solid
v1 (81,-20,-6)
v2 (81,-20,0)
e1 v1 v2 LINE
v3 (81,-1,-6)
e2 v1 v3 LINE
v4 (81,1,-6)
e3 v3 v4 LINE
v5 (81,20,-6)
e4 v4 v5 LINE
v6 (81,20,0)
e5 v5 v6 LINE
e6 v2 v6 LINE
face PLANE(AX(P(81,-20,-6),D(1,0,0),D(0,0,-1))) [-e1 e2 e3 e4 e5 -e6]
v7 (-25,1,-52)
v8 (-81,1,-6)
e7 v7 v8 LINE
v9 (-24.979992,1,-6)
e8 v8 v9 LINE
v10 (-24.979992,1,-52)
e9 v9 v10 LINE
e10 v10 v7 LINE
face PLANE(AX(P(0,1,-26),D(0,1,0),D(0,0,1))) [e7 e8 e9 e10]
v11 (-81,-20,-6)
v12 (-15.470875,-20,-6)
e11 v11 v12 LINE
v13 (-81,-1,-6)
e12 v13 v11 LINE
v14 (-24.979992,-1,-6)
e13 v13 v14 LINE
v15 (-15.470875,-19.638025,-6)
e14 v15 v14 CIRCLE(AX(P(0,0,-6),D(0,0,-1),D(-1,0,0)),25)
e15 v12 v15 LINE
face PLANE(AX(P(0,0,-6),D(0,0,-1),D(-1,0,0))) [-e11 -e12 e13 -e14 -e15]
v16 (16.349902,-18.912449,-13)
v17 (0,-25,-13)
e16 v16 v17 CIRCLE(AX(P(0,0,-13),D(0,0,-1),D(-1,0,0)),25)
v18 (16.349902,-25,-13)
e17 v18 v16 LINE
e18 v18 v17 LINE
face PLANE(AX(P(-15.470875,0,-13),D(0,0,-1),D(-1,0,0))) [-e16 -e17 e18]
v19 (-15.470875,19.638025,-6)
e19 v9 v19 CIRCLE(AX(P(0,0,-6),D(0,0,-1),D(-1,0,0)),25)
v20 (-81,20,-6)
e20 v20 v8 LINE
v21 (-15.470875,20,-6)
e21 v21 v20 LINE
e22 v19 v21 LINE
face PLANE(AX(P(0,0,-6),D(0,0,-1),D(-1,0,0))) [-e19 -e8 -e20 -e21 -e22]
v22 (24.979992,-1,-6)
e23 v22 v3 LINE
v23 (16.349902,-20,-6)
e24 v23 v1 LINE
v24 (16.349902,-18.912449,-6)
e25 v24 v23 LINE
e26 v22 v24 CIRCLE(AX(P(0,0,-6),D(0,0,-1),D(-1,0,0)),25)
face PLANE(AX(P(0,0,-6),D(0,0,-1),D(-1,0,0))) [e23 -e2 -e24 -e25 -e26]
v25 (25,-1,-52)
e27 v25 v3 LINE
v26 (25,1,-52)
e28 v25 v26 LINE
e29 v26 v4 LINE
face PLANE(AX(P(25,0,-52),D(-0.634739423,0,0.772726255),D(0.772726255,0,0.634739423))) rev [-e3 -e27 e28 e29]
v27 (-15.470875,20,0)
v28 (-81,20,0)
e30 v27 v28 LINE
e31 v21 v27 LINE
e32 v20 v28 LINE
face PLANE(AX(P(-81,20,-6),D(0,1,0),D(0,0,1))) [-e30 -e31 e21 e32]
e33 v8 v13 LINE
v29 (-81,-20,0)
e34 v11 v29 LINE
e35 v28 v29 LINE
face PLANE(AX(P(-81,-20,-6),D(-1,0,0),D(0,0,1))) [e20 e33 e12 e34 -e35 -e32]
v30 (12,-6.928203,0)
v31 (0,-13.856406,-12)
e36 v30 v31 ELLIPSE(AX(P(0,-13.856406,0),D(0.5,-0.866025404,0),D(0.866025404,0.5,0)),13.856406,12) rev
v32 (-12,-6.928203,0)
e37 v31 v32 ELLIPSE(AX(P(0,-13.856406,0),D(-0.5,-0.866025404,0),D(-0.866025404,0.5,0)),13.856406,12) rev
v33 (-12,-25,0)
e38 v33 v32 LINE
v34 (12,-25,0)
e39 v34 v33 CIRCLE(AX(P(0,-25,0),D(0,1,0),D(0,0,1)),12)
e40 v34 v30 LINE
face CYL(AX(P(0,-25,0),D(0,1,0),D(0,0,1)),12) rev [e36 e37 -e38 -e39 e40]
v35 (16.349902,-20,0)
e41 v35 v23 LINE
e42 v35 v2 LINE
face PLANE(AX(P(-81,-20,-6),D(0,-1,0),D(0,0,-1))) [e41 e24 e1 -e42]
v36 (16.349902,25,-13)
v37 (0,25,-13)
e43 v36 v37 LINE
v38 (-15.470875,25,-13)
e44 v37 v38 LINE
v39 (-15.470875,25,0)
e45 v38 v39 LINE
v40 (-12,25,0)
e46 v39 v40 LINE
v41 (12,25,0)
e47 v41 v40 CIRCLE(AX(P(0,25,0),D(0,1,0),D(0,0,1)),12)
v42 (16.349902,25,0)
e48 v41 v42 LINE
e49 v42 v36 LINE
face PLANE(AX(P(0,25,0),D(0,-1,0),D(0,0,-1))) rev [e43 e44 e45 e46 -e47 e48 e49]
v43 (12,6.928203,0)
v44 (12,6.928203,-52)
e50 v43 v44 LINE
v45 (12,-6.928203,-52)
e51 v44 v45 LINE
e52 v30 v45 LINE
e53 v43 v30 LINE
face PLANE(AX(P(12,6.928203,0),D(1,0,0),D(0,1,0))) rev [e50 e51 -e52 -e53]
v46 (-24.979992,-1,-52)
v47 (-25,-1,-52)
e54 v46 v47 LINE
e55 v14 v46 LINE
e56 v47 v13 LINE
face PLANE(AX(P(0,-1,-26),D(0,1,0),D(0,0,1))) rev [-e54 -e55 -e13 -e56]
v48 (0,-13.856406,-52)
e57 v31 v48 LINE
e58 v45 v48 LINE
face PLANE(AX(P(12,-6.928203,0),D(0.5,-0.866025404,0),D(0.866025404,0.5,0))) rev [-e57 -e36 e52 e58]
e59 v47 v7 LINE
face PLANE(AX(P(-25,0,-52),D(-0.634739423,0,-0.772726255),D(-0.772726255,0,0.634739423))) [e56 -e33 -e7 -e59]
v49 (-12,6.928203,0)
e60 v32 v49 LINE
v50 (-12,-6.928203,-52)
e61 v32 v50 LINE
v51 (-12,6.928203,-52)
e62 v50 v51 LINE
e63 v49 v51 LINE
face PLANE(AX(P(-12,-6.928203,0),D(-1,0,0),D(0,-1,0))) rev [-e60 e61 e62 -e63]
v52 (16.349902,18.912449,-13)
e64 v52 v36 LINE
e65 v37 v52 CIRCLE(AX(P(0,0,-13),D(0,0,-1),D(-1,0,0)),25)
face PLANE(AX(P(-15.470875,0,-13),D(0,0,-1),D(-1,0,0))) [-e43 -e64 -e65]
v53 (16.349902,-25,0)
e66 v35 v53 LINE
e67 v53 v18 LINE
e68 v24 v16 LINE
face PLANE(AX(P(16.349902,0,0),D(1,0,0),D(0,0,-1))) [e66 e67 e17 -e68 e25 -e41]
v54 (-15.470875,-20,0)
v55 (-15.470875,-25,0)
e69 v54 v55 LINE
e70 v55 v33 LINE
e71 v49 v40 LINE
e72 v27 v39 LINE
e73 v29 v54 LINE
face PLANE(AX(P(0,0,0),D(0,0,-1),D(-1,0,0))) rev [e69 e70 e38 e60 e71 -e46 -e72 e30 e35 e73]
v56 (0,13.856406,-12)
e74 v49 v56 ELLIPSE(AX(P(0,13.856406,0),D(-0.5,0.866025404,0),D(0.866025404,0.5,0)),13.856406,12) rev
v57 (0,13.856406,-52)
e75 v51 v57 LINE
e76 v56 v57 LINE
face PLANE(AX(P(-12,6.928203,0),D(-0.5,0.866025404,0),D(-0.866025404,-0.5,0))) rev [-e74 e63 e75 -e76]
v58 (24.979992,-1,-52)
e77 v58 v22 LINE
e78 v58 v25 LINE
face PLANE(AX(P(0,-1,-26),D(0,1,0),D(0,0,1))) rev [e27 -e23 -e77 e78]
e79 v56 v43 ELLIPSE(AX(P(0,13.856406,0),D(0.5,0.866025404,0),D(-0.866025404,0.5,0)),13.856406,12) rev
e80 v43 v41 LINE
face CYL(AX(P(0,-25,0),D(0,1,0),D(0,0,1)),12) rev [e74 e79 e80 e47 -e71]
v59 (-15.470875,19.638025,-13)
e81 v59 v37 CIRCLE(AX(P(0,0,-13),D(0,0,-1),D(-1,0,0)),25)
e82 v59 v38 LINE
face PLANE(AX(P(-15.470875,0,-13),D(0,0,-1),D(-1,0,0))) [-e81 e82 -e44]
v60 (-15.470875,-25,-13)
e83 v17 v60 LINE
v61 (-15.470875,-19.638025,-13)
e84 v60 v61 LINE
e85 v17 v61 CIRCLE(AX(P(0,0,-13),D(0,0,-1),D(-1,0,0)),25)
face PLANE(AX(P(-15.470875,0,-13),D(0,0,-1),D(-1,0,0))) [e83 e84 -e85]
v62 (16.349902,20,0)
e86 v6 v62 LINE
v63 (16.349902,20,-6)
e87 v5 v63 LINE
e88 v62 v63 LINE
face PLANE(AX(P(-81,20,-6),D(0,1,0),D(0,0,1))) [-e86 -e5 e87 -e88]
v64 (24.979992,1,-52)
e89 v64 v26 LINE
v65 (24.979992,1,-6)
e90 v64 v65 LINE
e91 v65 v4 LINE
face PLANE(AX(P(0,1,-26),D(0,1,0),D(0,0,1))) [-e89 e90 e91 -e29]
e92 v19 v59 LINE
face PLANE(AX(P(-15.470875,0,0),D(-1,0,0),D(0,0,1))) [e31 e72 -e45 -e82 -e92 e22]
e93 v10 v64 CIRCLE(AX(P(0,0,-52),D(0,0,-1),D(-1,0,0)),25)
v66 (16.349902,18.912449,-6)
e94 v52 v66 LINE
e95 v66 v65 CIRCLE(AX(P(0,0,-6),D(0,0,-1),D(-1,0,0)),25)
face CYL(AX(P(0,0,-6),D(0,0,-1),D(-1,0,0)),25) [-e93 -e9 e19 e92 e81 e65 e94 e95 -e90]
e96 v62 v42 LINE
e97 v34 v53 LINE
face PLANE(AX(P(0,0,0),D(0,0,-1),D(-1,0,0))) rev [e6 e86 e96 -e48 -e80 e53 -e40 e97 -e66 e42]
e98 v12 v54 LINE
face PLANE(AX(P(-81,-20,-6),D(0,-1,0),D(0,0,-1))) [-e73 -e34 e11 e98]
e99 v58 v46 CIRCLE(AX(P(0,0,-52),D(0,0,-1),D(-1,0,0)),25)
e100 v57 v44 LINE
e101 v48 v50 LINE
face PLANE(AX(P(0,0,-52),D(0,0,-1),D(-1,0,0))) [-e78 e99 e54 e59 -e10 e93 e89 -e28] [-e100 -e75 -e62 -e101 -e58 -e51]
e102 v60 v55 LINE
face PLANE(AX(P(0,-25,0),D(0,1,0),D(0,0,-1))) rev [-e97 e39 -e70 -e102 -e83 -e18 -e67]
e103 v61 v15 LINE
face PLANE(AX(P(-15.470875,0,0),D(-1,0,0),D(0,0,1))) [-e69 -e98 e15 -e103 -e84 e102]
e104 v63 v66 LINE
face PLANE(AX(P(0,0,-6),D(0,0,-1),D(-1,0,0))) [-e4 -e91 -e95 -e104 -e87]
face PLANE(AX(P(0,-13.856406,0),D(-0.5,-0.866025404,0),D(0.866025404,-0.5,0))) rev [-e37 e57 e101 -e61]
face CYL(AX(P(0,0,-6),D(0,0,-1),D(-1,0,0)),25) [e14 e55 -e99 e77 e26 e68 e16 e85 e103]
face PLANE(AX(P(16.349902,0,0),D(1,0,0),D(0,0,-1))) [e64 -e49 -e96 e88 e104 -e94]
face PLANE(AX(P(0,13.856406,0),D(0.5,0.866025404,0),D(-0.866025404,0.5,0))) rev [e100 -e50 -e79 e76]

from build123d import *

# Parameters (mm, degrees)
SKETCH1_W                = 162
SKETCH1_H                = 40
BOSS_EXTRUDE1_DEPTH      = 6
BOSS_EXTRUDE2_START      = -20
SKETCH2_W                = 31.820776168
SKETCH2_H                = 13
BOSS_EXTRUDE2_DEPTH      = 25
CUT_EXTRUDE1_DEPTH       = 97.072888996
BOSS_EXTRUDE3_DEPTH      = 39
BOSS_EXTRUDE3_DEPTH_BACK = 7
SKETCH4_R                = 25
SKETCH5_R                = 12
CUT_EXTRUDE3_DEPTH       = 109.466584762
CUT_EXTRUDE4_DEPTH       = 100.448479124
RIB5_START               = -1
RIB5_DEPTH               = 2


with BuildPart() as part:
    # Sketch1 → Boss-Extrude1 (new body)
    with BuildSketch(Plane.XY):
        Rectangle(SKETCH1_W, SKETCH1_H)
    extrude(amount=-BOSS_EXTRUDE1_DEPTH)

    # Sketch2 → Boss-Extrude2 (add)
    with BuildSketch(Plane(origin=(0, 20, 0), x_dir=(1, 0, 0), z_dir=(0, 1, 0)).offset(BOSS_EXTRUDE2_START)):
        with Locations((0.439513483, 6.5)):
            Rectangle(SKETCH2_W, SKETCH2_H)
    boss_extrude2 = extrude(amount=BOSS_EXTRUDE2_DEPTH)

    # Mirror1: Boss-Extrude2 across plane
    add(boss_extrude2.mirror(Plane.ZX))

    # Sketch3 → Cut-Extrude1 (cut, through all)
    with BuildSketch(Plane(origin=(0, 25, 0), x_dir=(1, 0, 0), z_dir=(0, 1, 0))):
        with BuildLine():
            Line((-12, 0), (12, 0))
            ThreePointArc((12, 0), (0, 12), (-12, 0))
        make_face()
    extrude(amount=-CUT_EXTRUDE1_DEPTH, mode=Mode.SUBTRACT)

    # Sketch4 → Boss-Extrude3 (add, two sides: drawn at the far end of the back side and taken through both)
    with BuildSketch(Plane(origin=(0, 0, -13), x_dir=(-1, 0, 0), z_dir=(0, 0, -1)).offset(-BOSS_EXTRUDE3_DEPTH_BACK)):
        Circle(SKETCH4_R)
    extrude(amount=BOSS_EXTRUDE3_DEPTH + BOSS_EXTRUDE3_DEPTH_BACK)

    # Sketch5 → Cut-Extrude3 (cut, through all)
    with BuildSketch(Plane.XZ.offset(25)):
        Circle(SKETCH5_R)
    extrude(amount=-CUT_EXTRUDE3_DEPTH, mode=Mode.SUBTRACT)

    # Sketch6 → Cut-Extrude4 (cut, through all)
    with BuildSketch(Plane(origin=(0, 0, -52), x_dir=(-1, 0, 0), z_dir=(0, 0, -1))):
        Polygon((0, 13.856406461), (-12, 6.92820323), (-12, -6.92820323), (0, -13.856406461), (12, -6.92820323), (12, 6.92820323), align=None)
    extrude(amount=-CUT_EXTRUDE4_DEPTH, mode=Mode.SUBTRACT)

    # Rib5: read off the stored shape, not the designer's step
    # Rib5 outline → Rib5 (add)
    with BuildSketch(Plane(origin=(0, 0, 0), x_dir=(1, 0, 0), z_dir=(0, 1, 0)).offset(RIB5_START)):
        Polygon((81, 6), (25, 52), (24.979991994, 52), (24.979991994, 6), align=None)
    rib5 = extrude(amount=RIB5_DEPTH)

    # Mirror2: Rib5 across plane
    add(rib5.mirror(Plane(origin=(0, 0, 0), x_dir=(0, 0, 1), z_dir=(1, 0, 0))))


solid = part.part
